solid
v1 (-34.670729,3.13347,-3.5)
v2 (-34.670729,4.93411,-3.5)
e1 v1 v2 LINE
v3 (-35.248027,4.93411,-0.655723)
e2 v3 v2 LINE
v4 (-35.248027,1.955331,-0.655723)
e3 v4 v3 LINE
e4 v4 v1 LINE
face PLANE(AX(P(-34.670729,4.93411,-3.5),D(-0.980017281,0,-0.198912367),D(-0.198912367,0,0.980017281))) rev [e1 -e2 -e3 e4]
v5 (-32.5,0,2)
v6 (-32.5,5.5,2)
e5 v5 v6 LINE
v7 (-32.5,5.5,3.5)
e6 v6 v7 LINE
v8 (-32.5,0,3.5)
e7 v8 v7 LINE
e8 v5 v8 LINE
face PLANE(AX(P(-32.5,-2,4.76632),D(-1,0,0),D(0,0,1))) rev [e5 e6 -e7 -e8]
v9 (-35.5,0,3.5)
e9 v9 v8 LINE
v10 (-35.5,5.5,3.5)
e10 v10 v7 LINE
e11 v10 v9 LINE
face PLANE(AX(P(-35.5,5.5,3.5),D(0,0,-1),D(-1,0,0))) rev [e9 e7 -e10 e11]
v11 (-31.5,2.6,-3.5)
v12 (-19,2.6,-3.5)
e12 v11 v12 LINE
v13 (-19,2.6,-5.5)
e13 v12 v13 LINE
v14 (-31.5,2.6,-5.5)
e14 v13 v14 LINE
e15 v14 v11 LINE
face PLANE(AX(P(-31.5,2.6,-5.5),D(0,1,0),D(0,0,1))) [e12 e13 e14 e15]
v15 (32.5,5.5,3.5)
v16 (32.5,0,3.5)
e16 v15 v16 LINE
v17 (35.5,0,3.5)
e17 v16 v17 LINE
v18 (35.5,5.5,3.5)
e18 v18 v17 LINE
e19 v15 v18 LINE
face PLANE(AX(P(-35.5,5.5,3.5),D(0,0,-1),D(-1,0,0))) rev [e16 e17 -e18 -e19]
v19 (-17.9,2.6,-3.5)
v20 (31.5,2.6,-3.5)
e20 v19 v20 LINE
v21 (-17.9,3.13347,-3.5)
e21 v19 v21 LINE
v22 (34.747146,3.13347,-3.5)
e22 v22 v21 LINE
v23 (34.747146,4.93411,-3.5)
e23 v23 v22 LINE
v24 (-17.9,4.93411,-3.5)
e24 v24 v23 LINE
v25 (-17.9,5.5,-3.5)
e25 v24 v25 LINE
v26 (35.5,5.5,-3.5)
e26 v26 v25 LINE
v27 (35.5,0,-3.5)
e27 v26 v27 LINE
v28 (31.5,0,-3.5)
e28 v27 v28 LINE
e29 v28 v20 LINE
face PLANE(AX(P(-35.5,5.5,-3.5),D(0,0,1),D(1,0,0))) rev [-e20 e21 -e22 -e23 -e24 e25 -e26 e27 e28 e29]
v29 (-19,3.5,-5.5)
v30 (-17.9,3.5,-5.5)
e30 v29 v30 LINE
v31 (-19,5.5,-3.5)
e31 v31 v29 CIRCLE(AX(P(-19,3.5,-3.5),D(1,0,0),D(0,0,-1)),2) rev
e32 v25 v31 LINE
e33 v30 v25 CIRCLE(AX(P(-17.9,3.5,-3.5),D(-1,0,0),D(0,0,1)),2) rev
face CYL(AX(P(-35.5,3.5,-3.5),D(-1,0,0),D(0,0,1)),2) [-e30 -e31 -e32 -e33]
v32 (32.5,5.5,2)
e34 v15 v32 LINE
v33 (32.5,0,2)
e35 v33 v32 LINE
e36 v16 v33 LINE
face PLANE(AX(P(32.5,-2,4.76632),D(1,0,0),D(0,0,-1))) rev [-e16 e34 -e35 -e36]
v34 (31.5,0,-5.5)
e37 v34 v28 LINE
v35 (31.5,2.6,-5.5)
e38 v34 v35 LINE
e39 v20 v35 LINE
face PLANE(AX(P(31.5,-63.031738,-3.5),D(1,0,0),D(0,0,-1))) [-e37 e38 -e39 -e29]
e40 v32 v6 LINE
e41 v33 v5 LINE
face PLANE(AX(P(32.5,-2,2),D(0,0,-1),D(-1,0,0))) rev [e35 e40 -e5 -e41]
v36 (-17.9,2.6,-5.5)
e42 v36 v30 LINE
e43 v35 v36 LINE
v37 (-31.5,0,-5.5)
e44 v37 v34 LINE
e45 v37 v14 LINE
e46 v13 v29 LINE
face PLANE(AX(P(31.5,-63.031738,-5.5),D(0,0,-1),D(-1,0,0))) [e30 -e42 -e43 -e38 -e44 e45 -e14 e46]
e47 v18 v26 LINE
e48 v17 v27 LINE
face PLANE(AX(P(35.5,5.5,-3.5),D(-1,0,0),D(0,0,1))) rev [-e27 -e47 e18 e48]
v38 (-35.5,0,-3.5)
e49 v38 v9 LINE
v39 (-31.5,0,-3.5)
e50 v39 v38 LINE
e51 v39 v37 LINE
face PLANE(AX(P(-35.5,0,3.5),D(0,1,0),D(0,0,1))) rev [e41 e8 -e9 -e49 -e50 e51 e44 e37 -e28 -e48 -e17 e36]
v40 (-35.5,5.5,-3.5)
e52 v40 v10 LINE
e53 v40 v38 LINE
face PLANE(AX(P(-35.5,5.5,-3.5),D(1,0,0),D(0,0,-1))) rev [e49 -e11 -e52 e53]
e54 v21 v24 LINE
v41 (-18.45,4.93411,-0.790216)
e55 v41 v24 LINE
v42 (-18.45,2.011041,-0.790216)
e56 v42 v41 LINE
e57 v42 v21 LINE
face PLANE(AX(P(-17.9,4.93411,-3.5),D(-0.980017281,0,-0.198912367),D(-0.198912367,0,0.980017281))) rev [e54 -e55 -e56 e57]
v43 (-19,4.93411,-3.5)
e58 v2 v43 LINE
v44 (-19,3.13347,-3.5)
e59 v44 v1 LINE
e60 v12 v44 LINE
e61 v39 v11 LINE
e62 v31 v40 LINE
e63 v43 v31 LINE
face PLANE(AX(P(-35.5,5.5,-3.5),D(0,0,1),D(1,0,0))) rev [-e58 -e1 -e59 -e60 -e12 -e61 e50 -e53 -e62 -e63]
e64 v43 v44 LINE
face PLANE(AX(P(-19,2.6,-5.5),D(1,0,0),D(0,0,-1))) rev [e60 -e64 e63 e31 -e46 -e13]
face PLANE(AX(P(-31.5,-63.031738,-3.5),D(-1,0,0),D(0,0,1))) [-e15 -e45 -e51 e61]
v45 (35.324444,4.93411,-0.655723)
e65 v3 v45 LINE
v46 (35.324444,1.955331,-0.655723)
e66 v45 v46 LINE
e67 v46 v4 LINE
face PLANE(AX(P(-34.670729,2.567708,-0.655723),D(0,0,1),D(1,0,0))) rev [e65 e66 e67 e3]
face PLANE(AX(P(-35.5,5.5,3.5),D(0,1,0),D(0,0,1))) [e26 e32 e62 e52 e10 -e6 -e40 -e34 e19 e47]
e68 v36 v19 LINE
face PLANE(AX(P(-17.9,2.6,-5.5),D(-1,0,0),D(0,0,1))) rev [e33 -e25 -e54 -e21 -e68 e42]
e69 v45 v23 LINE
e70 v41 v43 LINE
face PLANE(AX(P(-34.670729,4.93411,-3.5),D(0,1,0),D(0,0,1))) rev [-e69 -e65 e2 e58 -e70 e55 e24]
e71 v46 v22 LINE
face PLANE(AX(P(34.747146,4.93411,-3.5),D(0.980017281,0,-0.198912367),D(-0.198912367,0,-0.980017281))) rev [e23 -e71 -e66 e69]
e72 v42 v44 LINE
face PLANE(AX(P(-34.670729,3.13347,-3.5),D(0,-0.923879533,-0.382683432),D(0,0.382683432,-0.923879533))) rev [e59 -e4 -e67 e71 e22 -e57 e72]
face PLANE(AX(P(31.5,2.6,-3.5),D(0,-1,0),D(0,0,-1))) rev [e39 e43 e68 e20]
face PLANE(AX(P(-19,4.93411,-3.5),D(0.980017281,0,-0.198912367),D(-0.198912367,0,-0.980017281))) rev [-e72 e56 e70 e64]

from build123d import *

# Parameters (mm, degrees)
SKETCH1_W          = 71
SKETCH1_H          = 7
EXTRUDE1_DEPTH     = 5.5
SKETCH2_W          = 65
SKETCH2_H          = 2.766320183
CUT_EXTRUDE1_DEPTH = 7.5
SKETCH3_W          = 63
SKETCH3_H          = 2
EXTRUDE2_DEPTH     = 5.5
SKETCH4_W          = 49.4
SKETCH4_H          = 2
SKETCH4_W_2        = 12.5
CUT_EXTRUDE2_DEPTH = 2.9
FILLET1_R          = 2
EXTRUDE3_START     = 1.955331485
EXTRUDE3_DEPTH     = 2.978778395
EXTRUDE3_START_2   = -35.5
EXTRUDE3_2_DEPTH   = 71


with BuildPart() as part:
    # Sketch1 → Extrude1 (new body)
    with BuildSketch(Plane(origin=(0, 0, 0), x_dir=(1, 0, 0), z_dir=(0, 1, 0))):
        Rectangle(SKETCH1_W, SKETCH1_H)
    extrude(amount=EXTRUDE1_DEPTH)

    # Sketch2 → Cut-Extrude1 (cut)
    with BuildSketch(Plane(origin=(0, 5.5, 0), x_dir=(-1, 0, 0), z_dir=(0, 1, 0))):
        with Locations((0, 3.383160092)):
            Rectangle(SKETCH2_W, SKETCH2_H)
    extrude(amount=-CUT_EXTRUDE1_DEPTH, mode=Mode.SUBTRACT)

    # Sketch3 → Extrude2 (add)
    with BuildSketch(Plane(origin=(0, 5.5, 0), x_dir=(-1, 0, 0), z_dir=(0, 1, 0))):
        with Locations((0, -4.5)):
            Rectangle(SKETCH3_W, SKETCH3_H)
    extrude(amount=-EXTRUDE2_DEPTH)

    # Sketch4 → Cut-Extrude2 (cut)
    with BuildSketch(Plane(origin=(0, 5.5, 0), x_dir=(-1, 0, 0), z_dir=(0, 1, 0))):
        with Locations((-6.8, -4.5)):
            Rectangle(SKETCH4_W, SKETCH4_H)
        with Locations((25.25, -4.5)):
            Rectangle(SKETCH4_W_2, SKETCH4_H)
    extrude(amount=-CUT_EXTRUDE2_DEPTH, mode=Mode.SUBTRACT)

    # Fillet1
    fillet1_edges = [part.edges().sort_by_distance(p)[0] for p in [
        (-18.45, 5.5, -5.5),
    ]]
    fillet(fillet1_edges, radius=FILLET1_R)

    # Extrude3: read off the stored shape, not the designer's step
    # Extrude3 outline → Extrude3 (cut)
    with BuildSketch(Plane(origin=(0, 0, 0), x_dir=(1, 0, 0), z_dir=(0, 1, 0)).offset(EXTRUDE3_START)):
        Polygon((-19, 3.5), (-34.670728733, 3.5), (-35.248026649, 0.655722687), (35.324444086, 0.655722687), (34.74714617, 3.5), (-17.9, 3.5), (-18.45, 0.790216232), align=None)
    extrude(amount=EXTRUDE3_DEPTH, mode=Mode.SUBTRACT)

    # Extrude3 2 outline → Extrude3 2 (add)
    with BuildSketch(Plane.YZ.offset(EXTRUDE3_START_2)):
        Polygon((1.955331485, -3.5), (3.133469723, -3.5), (1.955331485, -0.655722687), align=None)
    extrude(amount=EXTRUDE3_2_DEPTH)


solid = part.part
